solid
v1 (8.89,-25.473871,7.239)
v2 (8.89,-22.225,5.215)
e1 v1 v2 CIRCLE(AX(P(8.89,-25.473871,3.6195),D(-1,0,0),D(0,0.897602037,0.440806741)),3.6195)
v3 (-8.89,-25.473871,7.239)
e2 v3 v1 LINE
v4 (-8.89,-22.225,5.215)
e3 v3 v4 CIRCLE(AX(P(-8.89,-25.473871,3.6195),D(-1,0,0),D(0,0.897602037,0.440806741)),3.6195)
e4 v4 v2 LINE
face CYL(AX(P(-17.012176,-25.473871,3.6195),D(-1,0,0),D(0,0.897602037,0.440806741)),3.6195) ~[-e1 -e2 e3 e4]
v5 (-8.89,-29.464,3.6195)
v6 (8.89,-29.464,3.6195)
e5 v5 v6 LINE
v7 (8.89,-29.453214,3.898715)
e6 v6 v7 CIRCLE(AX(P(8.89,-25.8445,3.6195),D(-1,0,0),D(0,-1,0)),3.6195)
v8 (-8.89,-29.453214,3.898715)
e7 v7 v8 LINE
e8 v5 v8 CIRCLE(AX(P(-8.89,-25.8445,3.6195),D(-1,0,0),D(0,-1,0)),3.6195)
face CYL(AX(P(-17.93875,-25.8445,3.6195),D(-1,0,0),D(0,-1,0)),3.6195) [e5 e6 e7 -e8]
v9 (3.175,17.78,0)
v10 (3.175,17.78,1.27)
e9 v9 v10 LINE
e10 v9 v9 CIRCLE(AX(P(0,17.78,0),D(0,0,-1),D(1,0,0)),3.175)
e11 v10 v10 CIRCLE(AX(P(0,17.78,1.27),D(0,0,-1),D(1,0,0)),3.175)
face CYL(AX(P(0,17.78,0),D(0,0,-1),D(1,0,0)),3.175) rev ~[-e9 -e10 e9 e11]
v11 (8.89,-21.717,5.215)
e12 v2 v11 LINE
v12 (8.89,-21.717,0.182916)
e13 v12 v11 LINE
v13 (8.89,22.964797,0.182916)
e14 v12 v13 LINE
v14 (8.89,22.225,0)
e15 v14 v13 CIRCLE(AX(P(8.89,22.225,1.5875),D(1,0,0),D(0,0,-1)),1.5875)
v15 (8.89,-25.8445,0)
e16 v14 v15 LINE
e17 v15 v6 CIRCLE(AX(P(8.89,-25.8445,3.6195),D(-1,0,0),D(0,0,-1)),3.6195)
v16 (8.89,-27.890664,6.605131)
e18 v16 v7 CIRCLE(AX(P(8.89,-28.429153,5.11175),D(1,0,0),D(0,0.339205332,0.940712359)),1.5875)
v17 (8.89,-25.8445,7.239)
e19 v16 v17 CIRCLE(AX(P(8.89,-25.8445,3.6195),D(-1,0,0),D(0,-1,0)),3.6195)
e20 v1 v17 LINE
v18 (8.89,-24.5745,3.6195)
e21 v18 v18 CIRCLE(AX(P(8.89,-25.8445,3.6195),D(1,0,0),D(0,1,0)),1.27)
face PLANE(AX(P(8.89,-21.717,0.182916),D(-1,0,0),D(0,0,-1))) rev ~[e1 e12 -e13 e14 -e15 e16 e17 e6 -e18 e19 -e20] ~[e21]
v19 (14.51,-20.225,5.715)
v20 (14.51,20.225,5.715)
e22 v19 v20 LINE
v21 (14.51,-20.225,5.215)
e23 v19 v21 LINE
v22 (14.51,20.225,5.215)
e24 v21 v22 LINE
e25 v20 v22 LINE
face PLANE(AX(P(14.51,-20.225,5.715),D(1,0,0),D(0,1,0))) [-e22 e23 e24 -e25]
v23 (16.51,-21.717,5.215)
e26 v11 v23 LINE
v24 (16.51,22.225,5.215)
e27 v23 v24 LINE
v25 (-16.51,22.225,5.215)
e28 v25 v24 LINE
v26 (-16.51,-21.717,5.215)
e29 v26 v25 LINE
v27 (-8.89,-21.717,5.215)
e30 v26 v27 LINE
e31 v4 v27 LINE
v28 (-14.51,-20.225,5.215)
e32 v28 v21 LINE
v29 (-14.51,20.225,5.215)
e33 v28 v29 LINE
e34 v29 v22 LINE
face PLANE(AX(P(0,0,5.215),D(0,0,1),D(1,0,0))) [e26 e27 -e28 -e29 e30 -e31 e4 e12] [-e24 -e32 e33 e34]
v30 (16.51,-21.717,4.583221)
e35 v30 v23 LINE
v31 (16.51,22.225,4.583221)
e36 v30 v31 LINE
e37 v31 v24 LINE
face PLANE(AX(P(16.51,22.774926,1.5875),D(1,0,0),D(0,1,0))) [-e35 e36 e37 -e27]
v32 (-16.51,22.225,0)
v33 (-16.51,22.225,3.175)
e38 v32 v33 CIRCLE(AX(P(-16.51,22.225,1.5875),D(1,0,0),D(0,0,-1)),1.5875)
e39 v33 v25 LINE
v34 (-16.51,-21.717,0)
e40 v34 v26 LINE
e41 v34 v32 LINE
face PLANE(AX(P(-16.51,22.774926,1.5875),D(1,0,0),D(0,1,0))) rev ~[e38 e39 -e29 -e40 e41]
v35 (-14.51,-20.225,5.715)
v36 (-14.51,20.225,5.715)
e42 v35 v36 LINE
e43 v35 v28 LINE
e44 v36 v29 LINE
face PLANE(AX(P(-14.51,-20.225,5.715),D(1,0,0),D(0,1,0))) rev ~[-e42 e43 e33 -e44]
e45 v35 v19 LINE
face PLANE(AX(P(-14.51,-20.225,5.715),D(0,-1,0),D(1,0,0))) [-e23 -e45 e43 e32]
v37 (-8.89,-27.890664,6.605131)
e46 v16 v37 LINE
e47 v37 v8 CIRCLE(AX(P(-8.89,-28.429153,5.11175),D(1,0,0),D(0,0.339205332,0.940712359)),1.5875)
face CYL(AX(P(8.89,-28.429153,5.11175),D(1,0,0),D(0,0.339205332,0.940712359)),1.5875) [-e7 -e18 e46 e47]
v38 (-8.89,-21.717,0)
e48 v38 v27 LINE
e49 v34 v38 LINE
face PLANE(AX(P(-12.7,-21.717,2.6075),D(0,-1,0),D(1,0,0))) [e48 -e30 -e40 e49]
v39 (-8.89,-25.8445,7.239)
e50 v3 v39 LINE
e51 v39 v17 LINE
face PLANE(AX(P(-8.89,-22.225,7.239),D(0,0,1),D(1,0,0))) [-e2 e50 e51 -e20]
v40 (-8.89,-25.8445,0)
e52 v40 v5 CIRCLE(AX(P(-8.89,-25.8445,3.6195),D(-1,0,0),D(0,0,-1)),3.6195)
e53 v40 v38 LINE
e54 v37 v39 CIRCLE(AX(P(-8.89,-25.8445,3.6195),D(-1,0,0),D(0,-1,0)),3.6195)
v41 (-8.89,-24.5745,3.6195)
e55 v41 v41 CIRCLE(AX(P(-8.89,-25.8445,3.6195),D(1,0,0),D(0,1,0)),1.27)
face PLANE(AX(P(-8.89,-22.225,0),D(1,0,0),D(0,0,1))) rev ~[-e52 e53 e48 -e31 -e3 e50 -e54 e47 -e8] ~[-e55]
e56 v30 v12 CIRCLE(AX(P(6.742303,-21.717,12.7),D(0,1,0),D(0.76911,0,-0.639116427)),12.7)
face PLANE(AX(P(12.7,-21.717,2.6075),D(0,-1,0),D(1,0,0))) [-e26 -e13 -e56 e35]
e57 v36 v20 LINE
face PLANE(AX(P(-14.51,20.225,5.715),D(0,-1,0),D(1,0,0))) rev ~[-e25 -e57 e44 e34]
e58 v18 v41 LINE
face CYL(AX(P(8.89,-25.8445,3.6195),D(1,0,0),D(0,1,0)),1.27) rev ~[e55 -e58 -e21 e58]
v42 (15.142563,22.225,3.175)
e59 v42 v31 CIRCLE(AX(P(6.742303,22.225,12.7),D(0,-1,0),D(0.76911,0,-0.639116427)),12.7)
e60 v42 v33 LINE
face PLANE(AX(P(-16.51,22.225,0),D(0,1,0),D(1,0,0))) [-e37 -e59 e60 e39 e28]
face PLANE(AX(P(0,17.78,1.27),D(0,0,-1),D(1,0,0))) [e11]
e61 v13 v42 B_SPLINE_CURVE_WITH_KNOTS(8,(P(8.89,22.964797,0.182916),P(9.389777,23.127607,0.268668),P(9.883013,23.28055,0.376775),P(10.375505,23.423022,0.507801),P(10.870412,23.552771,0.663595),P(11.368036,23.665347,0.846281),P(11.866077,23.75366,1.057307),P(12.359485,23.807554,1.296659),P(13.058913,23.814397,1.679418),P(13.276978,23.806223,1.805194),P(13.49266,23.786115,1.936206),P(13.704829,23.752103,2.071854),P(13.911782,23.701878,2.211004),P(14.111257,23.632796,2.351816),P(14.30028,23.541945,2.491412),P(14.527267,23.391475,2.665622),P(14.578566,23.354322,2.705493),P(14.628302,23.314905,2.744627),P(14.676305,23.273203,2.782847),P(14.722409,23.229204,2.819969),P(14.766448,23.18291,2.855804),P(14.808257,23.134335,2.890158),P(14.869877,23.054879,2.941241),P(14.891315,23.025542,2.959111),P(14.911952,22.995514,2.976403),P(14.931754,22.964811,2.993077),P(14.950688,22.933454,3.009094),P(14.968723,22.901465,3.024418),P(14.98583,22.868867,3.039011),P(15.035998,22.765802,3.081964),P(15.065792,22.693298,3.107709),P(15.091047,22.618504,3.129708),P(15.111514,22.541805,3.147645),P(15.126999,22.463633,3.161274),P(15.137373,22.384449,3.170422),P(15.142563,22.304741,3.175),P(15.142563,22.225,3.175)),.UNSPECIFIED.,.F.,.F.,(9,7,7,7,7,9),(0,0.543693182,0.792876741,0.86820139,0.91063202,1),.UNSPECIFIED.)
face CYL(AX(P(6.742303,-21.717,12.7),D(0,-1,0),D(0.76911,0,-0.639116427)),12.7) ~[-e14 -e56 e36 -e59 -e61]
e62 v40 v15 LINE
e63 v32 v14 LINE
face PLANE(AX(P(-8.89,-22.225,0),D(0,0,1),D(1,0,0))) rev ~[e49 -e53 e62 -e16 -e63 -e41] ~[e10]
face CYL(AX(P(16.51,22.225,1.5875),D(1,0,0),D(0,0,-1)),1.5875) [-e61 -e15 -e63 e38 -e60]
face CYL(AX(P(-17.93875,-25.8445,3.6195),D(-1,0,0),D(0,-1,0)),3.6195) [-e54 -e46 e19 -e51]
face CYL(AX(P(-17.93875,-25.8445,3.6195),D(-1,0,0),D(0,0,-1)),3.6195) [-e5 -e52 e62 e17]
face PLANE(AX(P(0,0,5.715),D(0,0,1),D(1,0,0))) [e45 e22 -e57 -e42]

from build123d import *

# Parameters (mm, degrees)
F0_W         = 33.02
F0_H         = 44.45
F1_DEPTH     = 5.715
F2_W         = 17.78
F2_H         = 7.239
F3_DEPTH     = 7.239
F4_R         = 1.27
F5_DEPTH     = 19.05
F6_W         = 33.02
F6_H         = 44.45
F6_W_2       = 29.02
F6_H_2       = 40.45
F7_DEPTH     = 0.5
F9_DEPTH     = 33.02
F10_T1_DEPTH = 35.8775
F10_T3_DEPTH = 34.0243528649
F11_R        = 3.175
F12_DEPTH    = 1.27
F14_DEPTH    = 17.78
F15_W        = 7.62
F15_H        = 5.215
F16_DEPTH    = 0.508
F19_DEPTH    = 76.2


# Not quite as in the source:
# - a fillet or chamfer that OpenCascade refuses, or shapes differently, is made with other operations: its cross-section is extruded or revolved along the edge and cut away or added


with BuildPart() as f1:
    # F0 (on Top) → F1 (new body)
    with BuildSketch(Plane.XY):
        Rectangle(F0_W, F0_H)
    extrude(amount=F1_DEPTH)

    # F2 (on face) → F3 (join)
    with BuildSketch(Plane.XZ.offset(22.225)):
        with Locations((0, 3.6195)):
            Rectangle(F2_W, F2_H)
    extrude(amount=F3_DEPTH)

    # F4 (on face) → F5 (cut)
    with BuildSketch(Plane.YZ.offset(8.89)):
        with Locations((-25.8445, 3.6195)):
            Circle(F4_R)
    extrude(amount=-F5_DEPTH, mode=Mode.SUBTRACT)

    # F6 (on face) → F7 (cut)
    with BuildSketch(Plane.XY.offset(5.715)):
        Rectangle(F6_W, F6_H)
        Rectangle(F6_W_2, F6_H_2, mode=Mode.SUBTRACT)
    extrude(amount=-F7_DEPTH, mode=Mode.SUBTRACT)

    # F8 (on face) → F9 (join, through all)
    with BuildSketch(Plane.YZ.offset(16.51)):
        with BuildLine():
            Line((22.225, 3.175), (22.225, 0))
            ThreePointArc((22.225, 0), (23.8125, 1.5875), (22.225, 3.175))
        make_face()
    extrude(amount=-F9_DEPTH)

    # F10: fillet of radius 3.6195 on 3 edges, made by hand

    # F10_s2 → F10_t1 (cut)
    with BuildSketch(Plane.YZ.offset(-17.93875)):
        with BuildLine():
            ThreePointArc((-29.464, 3.6195), (-28.4038729945, 6.1788729945), (-25.8445, 7.239))
            Line((-25.8445, 7.239), (-25.8445, 7.31139))
            Line((-25.8445, 7.31139), (-29.53639, 7.31139))
            Line((-29.53639, 7.31139), (-29.53639, 3.6195))
            Line((-29.53639, 3.6195), (-29.464, 3.6195))
        make_face()
        with BuildLine():
            ThreePointArc((-25.8445, 0), (-28.4038729945, 1.0601270055), (-29.464, 3.6195))
            Line((-29.464, 3.6195), (-29.53639, 3.6195))
            Line((-29.53639, 3.6195), (-29.53639, -0.07239))
            Line((-29.53639, -0.07239), (-25.8445, -0.07239))
            Line((-25.8445, -0.07239), (-25.8445, 0))
        make_face()
    extrude(amount=F10_T1_DEPTH, mode=Mode.SUBTRACT)

    # F10_s4 → F10_t3 (cut)
    with BuildSketch(Plane.YZ.offset(-17.0121764325)):
        with BuildLine():
            ThreePointArc((-22.225, 5.215), (-23.5599912664, 6.6916077862), (-25.473870573, 7.239))
            Line((-25.473870573, 7.239), (-25.473870573, 7.31139))
            Line((-25.473870573, 7.31139), (-22.225, 7.31139))
            Line((-22.225, 7.31139), (-22.15261, 7.239))
            ThreePointArc((-22.15261, 7.239), (-22.15261, 6.227), (-22.1600225885, 5.24691))
            Line((-22.1600225885, 5.24691), (-22.225, 5.215))
        make_face()
    extrude(amount=F10_T3_DEPTH, mode=Mode.SUBTRACT)

    # F11 (on face) → F12 (cut)
    with BuildSketch(Plane(origin=(0, 0, 0), x_dir=(1, 0, 0), z_dir=(0, 0, -1))):
        with Locations((0, -17.78)):
            Circle(F11_R)
    extrude(amount=-F12_DEPTH, mode=Mode.SUBTRACT)

    # F13 (on face) → F14 (join)
    with BuildSketch(Plane.YZ.offset(8.89)):
        with BuildLine():
            ThreePointArc((-29.4532143561, 3.8987148746), (-28.979078949, 5.42925), (-27.8906643526, 6.6051308701))
            ThreePointArc((-27.8906643526, 6.6051308701), (-29.8039681461, 5.9055), (-29.4532143561, 3.8987148746))
        make_face()
    extrude(amount=-F14_DEPTH)

    # F15 (on face) → F16 (cut)
    with BuildSketch(Plane.XZ.offset(22.225)):
        with Locations((-12.7, 2.6075)):
            Rectangle(F15_W, F15_H)
        with Locations((12.7, 2.6075)):
            Rectangle(F15_W, F15_H)
    extrude(amount=-F16_DEPTH, mode=Mode.SUBTRACT)

    # F18 (on face) → F19 (cut)
    with BuildSketch(Plane.XZ.offset(21.717)):
        with BuildLine():
            ThreePointArc((16.51, 4.5832213708), (13.0932734681, 1.702037729), (8.89, 0.182915771))
            Line((8.89, 0.182915771), (8.89, 0))
            Line((8.89, 0), (16.51, 0))
            Line((16.51, 0), (16.51, 4.5832213708))
        make_face()
    extrude(amount=-F19_DEPTH, mode=Mode.SUBTRACT)


solid = f1.part
